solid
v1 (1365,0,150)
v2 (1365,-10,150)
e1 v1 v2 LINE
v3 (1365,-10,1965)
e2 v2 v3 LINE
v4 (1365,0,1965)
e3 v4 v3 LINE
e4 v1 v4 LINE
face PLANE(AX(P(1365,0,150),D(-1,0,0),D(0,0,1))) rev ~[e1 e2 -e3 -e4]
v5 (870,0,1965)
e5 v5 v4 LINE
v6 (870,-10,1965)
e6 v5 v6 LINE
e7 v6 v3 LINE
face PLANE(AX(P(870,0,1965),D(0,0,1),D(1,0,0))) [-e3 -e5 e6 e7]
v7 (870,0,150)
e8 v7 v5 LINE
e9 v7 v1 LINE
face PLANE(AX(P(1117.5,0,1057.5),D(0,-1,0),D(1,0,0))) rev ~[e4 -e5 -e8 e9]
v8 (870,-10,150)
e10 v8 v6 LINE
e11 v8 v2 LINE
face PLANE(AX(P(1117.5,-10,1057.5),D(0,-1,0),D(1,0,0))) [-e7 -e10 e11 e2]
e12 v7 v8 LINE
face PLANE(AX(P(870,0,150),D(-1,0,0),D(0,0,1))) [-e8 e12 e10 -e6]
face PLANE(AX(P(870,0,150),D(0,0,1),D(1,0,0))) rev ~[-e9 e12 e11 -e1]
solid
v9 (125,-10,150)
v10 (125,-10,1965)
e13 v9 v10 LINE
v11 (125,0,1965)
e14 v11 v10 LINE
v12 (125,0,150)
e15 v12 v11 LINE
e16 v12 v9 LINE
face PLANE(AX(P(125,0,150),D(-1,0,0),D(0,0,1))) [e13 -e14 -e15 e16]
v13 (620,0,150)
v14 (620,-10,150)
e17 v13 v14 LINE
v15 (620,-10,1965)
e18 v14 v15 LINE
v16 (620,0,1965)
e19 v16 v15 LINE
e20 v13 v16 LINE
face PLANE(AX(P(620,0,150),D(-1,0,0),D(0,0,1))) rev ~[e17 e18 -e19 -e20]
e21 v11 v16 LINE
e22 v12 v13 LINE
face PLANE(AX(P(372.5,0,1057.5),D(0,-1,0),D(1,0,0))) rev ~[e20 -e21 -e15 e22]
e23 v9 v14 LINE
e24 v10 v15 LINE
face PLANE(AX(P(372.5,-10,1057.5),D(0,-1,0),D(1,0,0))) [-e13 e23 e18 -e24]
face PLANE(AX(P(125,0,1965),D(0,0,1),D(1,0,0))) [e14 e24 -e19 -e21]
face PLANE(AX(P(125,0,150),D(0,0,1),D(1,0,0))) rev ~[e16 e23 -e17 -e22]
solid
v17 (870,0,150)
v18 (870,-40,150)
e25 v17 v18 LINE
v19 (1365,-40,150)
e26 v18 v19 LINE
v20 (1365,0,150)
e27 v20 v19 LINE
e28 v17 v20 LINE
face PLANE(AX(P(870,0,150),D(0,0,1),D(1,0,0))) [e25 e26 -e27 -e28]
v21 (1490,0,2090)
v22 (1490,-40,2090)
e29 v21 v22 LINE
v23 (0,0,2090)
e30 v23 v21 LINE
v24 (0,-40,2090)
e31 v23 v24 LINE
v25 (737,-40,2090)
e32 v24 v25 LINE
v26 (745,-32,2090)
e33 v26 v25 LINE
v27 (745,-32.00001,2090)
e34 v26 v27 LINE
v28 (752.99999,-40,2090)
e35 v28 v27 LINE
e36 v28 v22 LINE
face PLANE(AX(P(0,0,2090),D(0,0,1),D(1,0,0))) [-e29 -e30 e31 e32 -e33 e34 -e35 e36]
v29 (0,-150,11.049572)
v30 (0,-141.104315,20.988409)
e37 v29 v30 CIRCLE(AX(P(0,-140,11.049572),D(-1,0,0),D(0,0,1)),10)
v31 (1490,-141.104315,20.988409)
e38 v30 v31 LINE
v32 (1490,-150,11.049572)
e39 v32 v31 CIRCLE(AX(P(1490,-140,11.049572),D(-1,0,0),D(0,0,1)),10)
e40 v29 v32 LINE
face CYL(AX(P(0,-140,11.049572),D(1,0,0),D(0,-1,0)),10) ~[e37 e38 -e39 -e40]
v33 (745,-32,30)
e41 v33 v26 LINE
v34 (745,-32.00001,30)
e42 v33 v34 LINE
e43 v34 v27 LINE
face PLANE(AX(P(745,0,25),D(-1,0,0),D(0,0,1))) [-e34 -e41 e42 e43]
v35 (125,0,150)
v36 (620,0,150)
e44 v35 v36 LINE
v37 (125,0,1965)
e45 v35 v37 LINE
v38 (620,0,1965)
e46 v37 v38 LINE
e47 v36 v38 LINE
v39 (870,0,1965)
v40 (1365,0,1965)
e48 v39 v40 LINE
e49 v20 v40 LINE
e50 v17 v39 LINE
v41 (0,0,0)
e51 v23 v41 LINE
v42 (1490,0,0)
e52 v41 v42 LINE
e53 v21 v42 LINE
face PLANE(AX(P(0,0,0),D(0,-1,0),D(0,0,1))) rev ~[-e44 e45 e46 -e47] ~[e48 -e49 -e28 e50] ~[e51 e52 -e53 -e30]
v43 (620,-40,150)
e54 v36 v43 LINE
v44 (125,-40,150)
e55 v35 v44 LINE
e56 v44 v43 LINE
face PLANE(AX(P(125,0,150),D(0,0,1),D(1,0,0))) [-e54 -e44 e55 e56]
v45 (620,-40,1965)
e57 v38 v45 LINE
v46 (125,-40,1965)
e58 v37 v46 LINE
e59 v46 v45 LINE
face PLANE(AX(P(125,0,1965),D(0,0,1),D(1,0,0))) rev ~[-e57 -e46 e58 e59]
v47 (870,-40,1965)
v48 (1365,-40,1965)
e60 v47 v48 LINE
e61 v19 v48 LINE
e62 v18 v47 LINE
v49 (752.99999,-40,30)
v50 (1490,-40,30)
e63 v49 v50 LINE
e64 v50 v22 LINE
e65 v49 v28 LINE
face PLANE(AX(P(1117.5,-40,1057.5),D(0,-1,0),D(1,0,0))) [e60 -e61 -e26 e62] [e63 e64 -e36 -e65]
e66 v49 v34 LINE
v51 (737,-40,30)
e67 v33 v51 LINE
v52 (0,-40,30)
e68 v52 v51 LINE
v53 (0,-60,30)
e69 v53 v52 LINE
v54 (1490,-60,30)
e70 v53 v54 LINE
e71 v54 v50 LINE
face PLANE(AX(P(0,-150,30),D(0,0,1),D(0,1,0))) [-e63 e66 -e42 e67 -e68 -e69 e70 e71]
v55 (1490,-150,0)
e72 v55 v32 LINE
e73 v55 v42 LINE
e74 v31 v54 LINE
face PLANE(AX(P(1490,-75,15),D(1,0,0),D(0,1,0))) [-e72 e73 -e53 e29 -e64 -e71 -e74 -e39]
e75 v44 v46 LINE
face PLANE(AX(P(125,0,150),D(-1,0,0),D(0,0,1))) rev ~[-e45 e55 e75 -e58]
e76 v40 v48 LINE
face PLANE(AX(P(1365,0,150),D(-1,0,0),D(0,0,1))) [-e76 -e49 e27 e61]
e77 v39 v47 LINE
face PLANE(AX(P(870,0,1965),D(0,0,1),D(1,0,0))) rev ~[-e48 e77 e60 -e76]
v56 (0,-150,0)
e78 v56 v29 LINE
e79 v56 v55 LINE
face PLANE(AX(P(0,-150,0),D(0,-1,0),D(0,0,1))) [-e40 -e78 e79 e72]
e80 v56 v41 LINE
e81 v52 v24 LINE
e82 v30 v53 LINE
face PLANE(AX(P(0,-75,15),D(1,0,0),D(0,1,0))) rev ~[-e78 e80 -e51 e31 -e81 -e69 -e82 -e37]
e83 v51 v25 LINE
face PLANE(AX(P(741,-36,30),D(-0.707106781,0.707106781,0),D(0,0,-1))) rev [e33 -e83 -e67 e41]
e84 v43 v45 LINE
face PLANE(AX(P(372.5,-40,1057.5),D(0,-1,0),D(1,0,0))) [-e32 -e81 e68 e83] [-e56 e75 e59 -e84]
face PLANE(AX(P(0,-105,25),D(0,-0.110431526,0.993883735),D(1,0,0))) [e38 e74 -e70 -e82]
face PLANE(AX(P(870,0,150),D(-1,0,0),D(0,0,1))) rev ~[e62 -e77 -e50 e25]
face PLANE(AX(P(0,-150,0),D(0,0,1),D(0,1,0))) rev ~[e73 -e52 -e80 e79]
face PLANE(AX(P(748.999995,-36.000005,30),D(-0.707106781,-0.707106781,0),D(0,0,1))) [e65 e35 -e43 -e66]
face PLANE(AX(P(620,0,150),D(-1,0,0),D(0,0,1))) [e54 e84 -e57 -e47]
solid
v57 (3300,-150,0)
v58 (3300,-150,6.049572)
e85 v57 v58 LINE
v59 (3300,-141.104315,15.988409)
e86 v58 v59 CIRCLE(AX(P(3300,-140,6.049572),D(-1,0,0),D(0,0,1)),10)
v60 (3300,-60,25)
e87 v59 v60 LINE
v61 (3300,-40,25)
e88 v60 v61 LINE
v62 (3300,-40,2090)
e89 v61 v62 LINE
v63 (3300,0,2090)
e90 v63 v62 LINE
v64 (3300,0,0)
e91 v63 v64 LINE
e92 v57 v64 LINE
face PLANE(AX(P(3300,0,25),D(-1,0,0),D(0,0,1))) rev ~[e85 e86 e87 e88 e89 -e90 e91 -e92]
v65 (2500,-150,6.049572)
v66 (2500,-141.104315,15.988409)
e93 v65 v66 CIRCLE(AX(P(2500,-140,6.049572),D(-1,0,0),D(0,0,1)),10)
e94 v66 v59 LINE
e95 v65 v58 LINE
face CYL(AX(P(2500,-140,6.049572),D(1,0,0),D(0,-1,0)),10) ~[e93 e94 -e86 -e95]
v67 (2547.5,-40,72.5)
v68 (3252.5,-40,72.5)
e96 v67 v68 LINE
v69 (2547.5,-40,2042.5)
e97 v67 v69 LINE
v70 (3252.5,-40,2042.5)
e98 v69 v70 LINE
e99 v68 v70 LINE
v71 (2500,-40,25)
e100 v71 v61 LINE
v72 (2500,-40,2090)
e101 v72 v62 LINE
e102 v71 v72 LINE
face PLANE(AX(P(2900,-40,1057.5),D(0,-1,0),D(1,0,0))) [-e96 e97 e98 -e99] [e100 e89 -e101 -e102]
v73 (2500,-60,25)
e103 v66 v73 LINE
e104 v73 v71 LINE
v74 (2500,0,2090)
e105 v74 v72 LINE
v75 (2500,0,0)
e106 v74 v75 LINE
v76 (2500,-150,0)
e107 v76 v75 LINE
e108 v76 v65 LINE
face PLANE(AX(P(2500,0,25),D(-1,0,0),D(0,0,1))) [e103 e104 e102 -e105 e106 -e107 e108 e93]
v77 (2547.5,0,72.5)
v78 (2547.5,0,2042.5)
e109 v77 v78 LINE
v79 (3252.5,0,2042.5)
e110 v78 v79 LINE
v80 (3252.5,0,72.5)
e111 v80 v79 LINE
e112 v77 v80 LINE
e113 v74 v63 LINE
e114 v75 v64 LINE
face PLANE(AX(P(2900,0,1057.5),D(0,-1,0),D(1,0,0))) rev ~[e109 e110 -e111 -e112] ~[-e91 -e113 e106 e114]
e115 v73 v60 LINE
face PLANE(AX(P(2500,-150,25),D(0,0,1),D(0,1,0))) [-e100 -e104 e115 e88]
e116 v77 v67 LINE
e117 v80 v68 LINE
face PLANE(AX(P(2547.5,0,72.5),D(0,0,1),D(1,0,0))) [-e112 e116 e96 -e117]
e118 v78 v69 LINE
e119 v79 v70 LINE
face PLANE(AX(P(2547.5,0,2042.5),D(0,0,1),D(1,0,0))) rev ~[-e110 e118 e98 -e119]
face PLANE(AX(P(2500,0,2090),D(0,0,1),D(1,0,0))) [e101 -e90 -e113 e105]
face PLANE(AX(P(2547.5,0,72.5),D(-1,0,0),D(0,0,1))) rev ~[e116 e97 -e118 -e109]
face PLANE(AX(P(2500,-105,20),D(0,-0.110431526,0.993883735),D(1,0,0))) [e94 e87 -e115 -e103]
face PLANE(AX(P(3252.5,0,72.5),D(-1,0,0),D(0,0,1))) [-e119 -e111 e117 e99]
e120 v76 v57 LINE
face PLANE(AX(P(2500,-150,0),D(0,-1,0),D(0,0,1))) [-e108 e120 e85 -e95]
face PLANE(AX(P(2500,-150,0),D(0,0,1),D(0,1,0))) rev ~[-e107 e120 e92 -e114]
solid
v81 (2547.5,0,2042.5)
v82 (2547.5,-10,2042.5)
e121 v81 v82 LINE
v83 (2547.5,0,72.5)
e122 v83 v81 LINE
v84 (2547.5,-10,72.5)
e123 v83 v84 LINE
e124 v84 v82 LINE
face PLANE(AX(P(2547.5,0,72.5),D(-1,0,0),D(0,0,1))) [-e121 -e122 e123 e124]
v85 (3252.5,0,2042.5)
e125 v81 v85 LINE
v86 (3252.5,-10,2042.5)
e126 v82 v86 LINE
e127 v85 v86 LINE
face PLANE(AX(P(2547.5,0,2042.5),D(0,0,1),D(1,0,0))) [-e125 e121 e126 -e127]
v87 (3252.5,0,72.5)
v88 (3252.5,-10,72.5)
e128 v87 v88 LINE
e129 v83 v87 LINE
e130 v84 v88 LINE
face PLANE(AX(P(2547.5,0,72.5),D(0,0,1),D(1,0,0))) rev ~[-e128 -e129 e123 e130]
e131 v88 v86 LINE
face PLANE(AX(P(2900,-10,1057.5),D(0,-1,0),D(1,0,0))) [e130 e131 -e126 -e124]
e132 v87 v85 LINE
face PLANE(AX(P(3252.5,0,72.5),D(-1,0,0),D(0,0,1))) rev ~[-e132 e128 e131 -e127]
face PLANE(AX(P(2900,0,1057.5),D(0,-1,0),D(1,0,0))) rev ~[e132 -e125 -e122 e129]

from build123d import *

# Parameters (mm, degrees)
F1_W      = 150
F1_H      = 30
F2_DEPTH  = 1490
F3_SIZE2  = 90
F3_SIZE   = 10
F4_R      = 10
F0_W      = 745
F0_H      = 2065
F0_W_2    = 495
F0_H_2    = 1815
F5_DEPTH  = 40
F6_SIZE   = 8
F7_DEPTH  = 40
F8_SIZE   = 7.99999
F9_DEPTH  = 10
F10_DEPTH = 10
F13_W     = 150
F13_H     = 25
F14_DEPTH = 800
F15_SIZE2 = 90
F15_SIZE  = 10
F16_R     = 10
F12_W     = 800
F12_H     = 2065
F12_W_2   = 705
F12_H_2   = 1970
F17_DEPTH = 40
F18_DEPTH = 10


# Not quite as in the source:
# - a fillet or chamfer is up to 0.001 mm smaller than in the source, because OpenCascade refuses the exact size


with BuildPart() as f2:
    # F1 (on Right) → F2 (new body)
    with BuildSketch(Plane.YZ):
        with Locations((-75, 15)):
            Rectangle(F1_W, F1_H)
    extrude(amount=F2_DEPTH)

    # F3
    f3_edges = [f2.edges().sort_by_distance(p)[0] for p in [
        (745, -150, 30),
    ]]
    f3_side = f2.faces().sort_by_distance((745, -150, 15))[0]
    chamfer(f3_edges, length=F3_SIZE, length2=F3_SIZE2, reference=f3_side)

    # F4
    f4_edges = [f2.edges().sort_by_distance(p)[0] for p in [
        (745, -150, 20),
    ]]
    fillet(f4_edges, radius=F4_R)

    # F0 (on Front) → F5 (join)
    with BuildSketch(Plane.XZ):
        with Locations((372.5, 1057.5)):
            Rectangle(F0_W, F0_H)
        with Locations((372.5, 1057.5)):
            Rectangle(F0_W_2, F0_H_2, mode=Mode.SUBTRACT)
    extrude(amount=F5_DEPTH)

    # F6
    f6_edges = [f2.edges().sort_by_distance(p)[0] for p in [
        (745, -40, 1060),
    ]]
    chamfer(f6_edges, length=F6_SIZE)

    # F0 (on Front) → F7 (join)
    with BuildSketch(Plane.XZ):
        with Locations((1117.5, 1057.5)):
            Rectangle(F0_W, F0_H)
        with Locations((1117.5, 1057.5)):
            Rectangle(F0_W_2, F0_H_2, mode=Mode.SUBTRACT)
    extrude(amount=F7_DEPTH)

    # F8 (size 8 in the source; OpenCascade refuses exactly that, so slightly less here)
    f8_edges = [f2.edges().sort_by_distance(p)[0] for p in [
        (745, -40, 1060),
    ]]
    chamfer(f8_edges, length=F8_SIZE)


with BuildPart() as f9:
    # F0 (on Front) → F9 (new body)
    with BuildSketch(Plane.XZ):
        with Locations((372.5, 1057.5)):
            Rectangle(F0_W_2, F0_H_2)
    extrude(amount=F9_DEPTH)


with BuildPart() as f10:
    # F0 (on Front) → F10 (new body)
    with BuildSketch(Plane.XZ):
        with Locations((1117.5, 1057.5)):
            Rectangle(F0_W_2, F0_H_2)
    extrude(amount=F10_DEPTH)


with BuildPart() as f14:
    # F13 (on offset) → F14 (new body)
    with BuildSketch(Plane.YZ.offset(2500)):
        with Locations((-75, 12.5)):
            Rectangle(F13_W, F13_H)
    extrude(amount=F14_DEPTH)

    # F15
    f15_edges = [f14.edges().sort_by_distance(p)[0] for p in [
        (2900, -150, 25),
    ]]
    f15_side = f14.faces().sort_by_distance((2900, -150, 12.5))[0]
    chamfer(f15_edges, length=F15_SIZE, length2=F15_SIZE2, reference=f15_side)

    # F16
    f16_edges = [f14.edges().sort_by_distance(p)[0] for p in [
        (2900, -150, 15),
    ]]
    fillet(f16_edges, radius=F16_R)

    # F12 (on Front) → F17 (join)
    with BuildSketch(Plane.XZ):
        with Locations((2900, 1057.5)):
            Rectangle(F12_W, F12_H)
        with Locations((2900, 1057.5)):
            Rectangle(F12_W_2, F12_H_2, mode=Mode.SUBTRACT)
    extrude(amount=F17_DEPTH)


with BuildPart() as f18:
    # F12 (on Front) → F18 (new body)
    with BuildSketch(Plane.XZ):
        with Locations((2900, 1057.5)):
            Rectangle(F12_W_2, F12_H_2)
    extrude(amount=F18_DEPTH)


solid = Compound([f2.part, f9.part, f10.part, f14.part, f18.part])
